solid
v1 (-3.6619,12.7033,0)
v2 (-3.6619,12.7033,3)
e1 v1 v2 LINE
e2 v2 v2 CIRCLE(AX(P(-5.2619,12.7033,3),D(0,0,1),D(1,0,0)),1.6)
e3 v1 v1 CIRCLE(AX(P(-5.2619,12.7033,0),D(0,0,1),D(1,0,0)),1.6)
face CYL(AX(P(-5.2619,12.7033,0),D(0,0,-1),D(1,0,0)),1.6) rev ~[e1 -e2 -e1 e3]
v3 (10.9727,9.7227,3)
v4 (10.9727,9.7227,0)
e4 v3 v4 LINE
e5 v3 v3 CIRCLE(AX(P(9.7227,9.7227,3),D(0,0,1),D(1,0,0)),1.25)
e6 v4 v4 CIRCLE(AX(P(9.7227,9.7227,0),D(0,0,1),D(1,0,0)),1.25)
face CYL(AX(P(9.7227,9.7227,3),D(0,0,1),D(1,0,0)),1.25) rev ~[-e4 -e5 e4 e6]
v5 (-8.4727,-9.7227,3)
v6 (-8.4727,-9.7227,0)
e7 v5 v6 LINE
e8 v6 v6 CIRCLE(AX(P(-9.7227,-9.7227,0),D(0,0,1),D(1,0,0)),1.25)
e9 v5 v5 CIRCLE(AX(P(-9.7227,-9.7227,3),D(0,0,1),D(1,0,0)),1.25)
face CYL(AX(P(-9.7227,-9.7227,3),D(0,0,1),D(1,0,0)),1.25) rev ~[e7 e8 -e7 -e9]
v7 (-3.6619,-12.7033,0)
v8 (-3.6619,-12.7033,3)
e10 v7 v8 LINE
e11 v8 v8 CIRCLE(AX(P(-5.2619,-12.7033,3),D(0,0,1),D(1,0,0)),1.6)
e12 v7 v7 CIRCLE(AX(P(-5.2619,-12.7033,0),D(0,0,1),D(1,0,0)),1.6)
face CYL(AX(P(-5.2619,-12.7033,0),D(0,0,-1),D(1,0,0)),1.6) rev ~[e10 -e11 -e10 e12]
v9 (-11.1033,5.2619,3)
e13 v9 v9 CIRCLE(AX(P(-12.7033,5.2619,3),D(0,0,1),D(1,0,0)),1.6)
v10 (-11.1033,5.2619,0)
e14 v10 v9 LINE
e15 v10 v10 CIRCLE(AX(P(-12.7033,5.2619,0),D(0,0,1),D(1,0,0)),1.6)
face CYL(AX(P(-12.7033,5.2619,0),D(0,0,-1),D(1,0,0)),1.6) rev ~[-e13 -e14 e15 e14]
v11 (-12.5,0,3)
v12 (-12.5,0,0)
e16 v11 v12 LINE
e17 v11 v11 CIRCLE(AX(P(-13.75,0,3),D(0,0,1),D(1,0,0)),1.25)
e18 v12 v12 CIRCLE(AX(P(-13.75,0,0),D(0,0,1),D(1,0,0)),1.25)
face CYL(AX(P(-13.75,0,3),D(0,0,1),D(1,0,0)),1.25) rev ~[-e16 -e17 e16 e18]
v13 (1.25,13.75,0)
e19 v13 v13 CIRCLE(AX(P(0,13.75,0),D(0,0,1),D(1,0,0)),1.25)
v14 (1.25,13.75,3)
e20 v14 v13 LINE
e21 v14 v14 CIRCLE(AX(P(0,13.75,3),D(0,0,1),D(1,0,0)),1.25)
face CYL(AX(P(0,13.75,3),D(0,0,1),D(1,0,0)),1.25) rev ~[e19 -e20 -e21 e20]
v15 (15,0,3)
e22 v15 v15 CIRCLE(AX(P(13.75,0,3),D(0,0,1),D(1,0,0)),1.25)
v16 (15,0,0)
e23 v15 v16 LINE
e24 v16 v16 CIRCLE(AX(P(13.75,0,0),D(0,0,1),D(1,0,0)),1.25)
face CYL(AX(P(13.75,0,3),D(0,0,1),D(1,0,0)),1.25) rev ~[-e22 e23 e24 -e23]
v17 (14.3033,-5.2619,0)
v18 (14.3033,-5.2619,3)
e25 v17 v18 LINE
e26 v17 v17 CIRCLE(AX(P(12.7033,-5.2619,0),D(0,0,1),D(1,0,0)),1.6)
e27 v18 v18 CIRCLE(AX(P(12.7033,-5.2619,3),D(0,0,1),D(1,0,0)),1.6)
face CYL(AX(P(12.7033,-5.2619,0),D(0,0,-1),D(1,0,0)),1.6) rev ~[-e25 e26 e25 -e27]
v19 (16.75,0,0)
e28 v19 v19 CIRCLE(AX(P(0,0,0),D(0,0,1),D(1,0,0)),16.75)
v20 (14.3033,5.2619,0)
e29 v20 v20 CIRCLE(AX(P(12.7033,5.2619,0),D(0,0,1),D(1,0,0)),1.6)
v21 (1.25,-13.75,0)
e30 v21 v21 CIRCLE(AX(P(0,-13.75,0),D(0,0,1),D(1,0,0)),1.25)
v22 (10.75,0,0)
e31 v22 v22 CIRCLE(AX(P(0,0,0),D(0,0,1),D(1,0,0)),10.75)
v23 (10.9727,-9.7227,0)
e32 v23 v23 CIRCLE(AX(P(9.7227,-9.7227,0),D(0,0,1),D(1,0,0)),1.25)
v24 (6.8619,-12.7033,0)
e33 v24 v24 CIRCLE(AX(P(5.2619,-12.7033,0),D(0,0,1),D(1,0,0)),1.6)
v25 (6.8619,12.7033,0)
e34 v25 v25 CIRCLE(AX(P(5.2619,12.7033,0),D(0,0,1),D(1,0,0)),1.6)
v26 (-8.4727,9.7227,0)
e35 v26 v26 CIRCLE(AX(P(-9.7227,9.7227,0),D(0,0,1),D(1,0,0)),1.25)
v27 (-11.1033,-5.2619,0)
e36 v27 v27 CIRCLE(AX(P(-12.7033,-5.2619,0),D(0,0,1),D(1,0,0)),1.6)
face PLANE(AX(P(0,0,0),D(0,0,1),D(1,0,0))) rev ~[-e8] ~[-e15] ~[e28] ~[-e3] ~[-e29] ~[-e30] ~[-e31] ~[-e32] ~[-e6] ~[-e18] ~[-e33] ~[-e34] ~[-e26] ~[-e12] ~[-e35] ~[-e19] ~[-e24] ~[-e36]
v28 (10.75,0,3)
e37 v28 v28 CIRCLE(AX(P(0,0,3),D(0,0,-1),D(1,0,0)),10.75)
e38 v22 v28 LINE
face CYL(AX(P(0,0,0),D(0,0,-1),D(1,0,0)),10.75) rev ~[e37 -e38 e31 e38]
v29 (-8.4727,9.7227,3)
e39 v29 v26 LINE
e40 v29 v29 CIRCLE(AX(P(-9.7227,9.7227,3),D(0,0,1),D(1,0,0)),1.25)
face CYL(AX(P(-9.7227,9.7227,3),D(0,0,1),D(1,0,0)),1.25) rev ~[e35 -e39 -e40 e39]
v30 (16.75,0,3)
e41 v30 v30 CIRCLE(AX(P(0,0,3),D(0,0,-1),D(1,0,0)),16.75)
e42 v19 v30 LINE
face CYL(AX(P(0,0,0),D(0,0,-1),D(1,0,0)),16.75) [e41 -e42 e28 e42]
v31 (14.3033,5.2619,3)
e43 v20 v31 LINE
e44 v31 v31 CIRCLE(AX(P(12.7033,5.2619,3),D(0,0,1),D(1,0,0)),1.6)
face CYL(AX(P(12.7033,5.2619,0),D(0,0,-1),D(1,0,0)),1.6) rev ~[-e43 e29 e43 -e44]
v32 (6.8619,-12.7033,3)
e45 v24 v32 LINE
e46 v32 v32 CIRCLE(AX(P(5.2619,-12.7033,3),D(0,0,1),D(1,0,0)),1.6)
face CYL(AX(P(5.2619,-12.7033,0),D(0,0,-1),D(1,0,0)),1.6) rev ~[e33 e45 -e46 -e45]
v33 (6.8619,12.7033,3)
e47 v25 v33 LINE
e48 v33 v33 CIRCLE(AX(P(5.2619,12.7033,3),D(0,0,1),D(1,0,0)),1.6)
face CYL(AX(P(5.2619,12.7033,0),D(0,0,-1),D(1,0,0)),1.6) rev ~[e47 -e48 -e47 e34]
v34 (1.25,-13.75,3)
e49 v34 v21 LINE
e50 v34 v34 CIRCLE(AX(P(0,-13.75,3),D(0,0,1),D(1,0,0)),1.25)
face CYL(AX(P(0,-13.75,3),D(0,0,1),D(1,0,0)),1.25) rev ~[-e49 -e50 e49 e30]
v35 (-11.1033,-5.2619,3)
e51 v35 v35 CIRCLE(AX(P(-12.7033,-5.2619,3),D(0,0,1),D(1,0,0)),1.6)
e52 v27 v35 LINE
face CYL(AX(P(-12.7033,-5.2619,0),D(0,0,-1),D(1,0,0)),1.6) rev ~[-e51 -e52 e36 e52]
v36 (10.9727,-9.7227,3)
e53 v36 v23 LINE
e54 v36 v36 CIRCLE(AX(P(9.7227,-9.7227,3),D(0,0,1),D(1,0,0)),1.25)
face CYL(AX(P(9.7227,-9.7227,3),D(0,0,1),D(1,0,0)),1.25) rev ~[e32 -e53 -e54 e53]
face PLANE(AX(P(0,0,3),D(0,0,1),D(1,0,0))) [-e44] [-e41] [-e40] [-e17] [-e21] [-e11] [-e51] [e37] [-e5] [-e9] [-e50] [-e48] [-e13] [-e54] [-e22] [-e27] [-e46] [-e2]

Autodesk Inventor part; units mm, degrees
ref_plane "YZ Plane" through (0, 0, 0) normal (1, 0, 0) x (0, 1, 0)
ref_plane "XZ Plane" through (0, 0, 0) normal (0, 1, 0) x (-1, 0, 0)
ref_plane "XY Plane" through (0, 0, 0) normal (0, 0, 1) x (1, 0, 0)
sketch "スケッチ1" plane through (0, 0, 0) normal (0, 0, 1) x (1, 0, 0)
  circle A0 centre (0, 0) radius 15.5 construction
  circle A1 centre (-16.7262, 17.2115) radius 1.6 projected
  circle A2 centre (0.3431, 23.9975) radius 1.6 projected
  circle A3 centre (17.2115, 16.7262) radius 1.6 projected
  circle A4 centre (23.9975, -0.3431) radius 1.6 projected
  circle A5 centre (16.7262, -17.2115) radius 1.6 projected
  circle A6 centre (-0.3431, -23.9975) radius 1.6 projected
  circle A7 centre (-17.2115, -16.7262) radius 1.6 projected
  circle A8 centre (-23.9975, 0.3431) radius 1.6 projected
  circle A9 centre (0, 0) radius 27.5 projected
  circle A10 centre (0, 0) radius 5.1 projected
  circle A11 centre (4.9497, -4.9497) radius 1.1 projected
  circle A12 centre (7, 0) radius 1.1 projected
  circle A13 centre (4.9497, 4.9497) radius 1.1 projected
  circle A14 centre (0, 7) radius 1.1 projected
  circle A15 centre (-4.9497, 4.9497) radius 1.1 projected
  circle A16 centre (-7, 0) radius 1.1 projected
  circle A17 centre (-4.9497, -4.9497) radius 1.1 projected
  circle A18 centre (0, -7) radius 1.1 projected
  circle A19 centre (0, 0) radius 20.5 projected
  circle A20 centre (0, 0) radius 10.75
  line L0 (0, 0) -> (13.125, 0) construction
  line L1 (9.2808, -9.2808) -> (0, 0) construction
  line L2 (0, 0) -> (12.7033, -5.2619) construction
  circle A21 centre (12.7033, -5.2619) radius 1.6
  circle A22 centre (0, 0) radius 16.75
  line L3 (0, 0) -> (0, -8.1)
  line L4 (0, -10.75) -> (0, -16.75)
  circle A23 centre (0, 0) radius 13.75 construction
  circle A24 centre (12.7033, 5.2619) radius 1.6
  circle A25 centre (0, 0) radius 13.75 construction
  circle A26 centre (5.2619, 12.7033) radius 1.6
  circle A27 centre (0, 0) radius 13.75 construction
  circle A28 centre (-5.2619, 12.7033) radius 1.6
  circle A29 centre (0, 0) radius 13.75 construction
  circle A30 centre (-12.7033, 5.2619) radius 1.6
  circle A31 centre (0, 0) radius 13.75 construction
  circle A32 centre (-12.7033, -5.2619) radius 1.6
  circle A33 centre (0, 0) radius 13.75 construction
  circle A34 centre (-5.2619, -12.7033) radius 1.6
  circle A35 centre (0, 0) radius 13.75 construction
  circle A36 centre (5.2619, -12.7033) radius 1.6
  circle A37 centre (0, 0) radius 13.75 construction
  dimension "d14" = 21.5
  dimension "d15" = 33.5
  dimension "d0" = 13.75
  dimension "d1" = 22.5
  dimension "d2" = 3.2
  dimension "d18" = 27.5
  dimension "d21" = 360
extrude "押し出し3" add sketch "スケッチ1" along normal blind 3 contours A22
sketch "スケッチ2" plane through (0, 0, 3) normal (0, 0, 1) x (1, 0, 0)
  circle A0 centre (0, 0) radius 16.75
  circle A1 centre (5.2619, -12.7033) radius 1.6 projected
  circle A2 centre (0, 0) radius 13.75 construction
  line L0 (0, 0) -> (5.2619, -12.7033)
  line L1 (0, 0) -> (-5.2619, -12.7033)
  line L2 (0, -13.75) -> (0, 0) construction
  circle A3 centre (0, -13.75) radius 1.25
  circle A4 centre (9.7227, -9.7227) radius 1.25
  circle A5 centre (13.75, 0) radius 1.25
  circle A6 centre (9.7227, 9.7227) radius 1.25
  circle A7 centre (0, 13.75) radius 1.25
  circle A8 centre (-9.7227, 9.7227) radius 1.25
  circle A9 centre (-13.75, 0) radius 1.25
  circle A10 centre (-9.7227, -9.7227) radius 1.25
  dimension "d25" = 2.5
  dimension "d28" = 360
extrude "押し出し4" cut sketch "スケッチ2" against normal through all contours A3 | A4 | A5 | A6 | A7 | A8 | A9 | A10
properties part number "出力部品B_ダブルスラスト用(t2_アルミ)" material "アルミニウム 6061"
